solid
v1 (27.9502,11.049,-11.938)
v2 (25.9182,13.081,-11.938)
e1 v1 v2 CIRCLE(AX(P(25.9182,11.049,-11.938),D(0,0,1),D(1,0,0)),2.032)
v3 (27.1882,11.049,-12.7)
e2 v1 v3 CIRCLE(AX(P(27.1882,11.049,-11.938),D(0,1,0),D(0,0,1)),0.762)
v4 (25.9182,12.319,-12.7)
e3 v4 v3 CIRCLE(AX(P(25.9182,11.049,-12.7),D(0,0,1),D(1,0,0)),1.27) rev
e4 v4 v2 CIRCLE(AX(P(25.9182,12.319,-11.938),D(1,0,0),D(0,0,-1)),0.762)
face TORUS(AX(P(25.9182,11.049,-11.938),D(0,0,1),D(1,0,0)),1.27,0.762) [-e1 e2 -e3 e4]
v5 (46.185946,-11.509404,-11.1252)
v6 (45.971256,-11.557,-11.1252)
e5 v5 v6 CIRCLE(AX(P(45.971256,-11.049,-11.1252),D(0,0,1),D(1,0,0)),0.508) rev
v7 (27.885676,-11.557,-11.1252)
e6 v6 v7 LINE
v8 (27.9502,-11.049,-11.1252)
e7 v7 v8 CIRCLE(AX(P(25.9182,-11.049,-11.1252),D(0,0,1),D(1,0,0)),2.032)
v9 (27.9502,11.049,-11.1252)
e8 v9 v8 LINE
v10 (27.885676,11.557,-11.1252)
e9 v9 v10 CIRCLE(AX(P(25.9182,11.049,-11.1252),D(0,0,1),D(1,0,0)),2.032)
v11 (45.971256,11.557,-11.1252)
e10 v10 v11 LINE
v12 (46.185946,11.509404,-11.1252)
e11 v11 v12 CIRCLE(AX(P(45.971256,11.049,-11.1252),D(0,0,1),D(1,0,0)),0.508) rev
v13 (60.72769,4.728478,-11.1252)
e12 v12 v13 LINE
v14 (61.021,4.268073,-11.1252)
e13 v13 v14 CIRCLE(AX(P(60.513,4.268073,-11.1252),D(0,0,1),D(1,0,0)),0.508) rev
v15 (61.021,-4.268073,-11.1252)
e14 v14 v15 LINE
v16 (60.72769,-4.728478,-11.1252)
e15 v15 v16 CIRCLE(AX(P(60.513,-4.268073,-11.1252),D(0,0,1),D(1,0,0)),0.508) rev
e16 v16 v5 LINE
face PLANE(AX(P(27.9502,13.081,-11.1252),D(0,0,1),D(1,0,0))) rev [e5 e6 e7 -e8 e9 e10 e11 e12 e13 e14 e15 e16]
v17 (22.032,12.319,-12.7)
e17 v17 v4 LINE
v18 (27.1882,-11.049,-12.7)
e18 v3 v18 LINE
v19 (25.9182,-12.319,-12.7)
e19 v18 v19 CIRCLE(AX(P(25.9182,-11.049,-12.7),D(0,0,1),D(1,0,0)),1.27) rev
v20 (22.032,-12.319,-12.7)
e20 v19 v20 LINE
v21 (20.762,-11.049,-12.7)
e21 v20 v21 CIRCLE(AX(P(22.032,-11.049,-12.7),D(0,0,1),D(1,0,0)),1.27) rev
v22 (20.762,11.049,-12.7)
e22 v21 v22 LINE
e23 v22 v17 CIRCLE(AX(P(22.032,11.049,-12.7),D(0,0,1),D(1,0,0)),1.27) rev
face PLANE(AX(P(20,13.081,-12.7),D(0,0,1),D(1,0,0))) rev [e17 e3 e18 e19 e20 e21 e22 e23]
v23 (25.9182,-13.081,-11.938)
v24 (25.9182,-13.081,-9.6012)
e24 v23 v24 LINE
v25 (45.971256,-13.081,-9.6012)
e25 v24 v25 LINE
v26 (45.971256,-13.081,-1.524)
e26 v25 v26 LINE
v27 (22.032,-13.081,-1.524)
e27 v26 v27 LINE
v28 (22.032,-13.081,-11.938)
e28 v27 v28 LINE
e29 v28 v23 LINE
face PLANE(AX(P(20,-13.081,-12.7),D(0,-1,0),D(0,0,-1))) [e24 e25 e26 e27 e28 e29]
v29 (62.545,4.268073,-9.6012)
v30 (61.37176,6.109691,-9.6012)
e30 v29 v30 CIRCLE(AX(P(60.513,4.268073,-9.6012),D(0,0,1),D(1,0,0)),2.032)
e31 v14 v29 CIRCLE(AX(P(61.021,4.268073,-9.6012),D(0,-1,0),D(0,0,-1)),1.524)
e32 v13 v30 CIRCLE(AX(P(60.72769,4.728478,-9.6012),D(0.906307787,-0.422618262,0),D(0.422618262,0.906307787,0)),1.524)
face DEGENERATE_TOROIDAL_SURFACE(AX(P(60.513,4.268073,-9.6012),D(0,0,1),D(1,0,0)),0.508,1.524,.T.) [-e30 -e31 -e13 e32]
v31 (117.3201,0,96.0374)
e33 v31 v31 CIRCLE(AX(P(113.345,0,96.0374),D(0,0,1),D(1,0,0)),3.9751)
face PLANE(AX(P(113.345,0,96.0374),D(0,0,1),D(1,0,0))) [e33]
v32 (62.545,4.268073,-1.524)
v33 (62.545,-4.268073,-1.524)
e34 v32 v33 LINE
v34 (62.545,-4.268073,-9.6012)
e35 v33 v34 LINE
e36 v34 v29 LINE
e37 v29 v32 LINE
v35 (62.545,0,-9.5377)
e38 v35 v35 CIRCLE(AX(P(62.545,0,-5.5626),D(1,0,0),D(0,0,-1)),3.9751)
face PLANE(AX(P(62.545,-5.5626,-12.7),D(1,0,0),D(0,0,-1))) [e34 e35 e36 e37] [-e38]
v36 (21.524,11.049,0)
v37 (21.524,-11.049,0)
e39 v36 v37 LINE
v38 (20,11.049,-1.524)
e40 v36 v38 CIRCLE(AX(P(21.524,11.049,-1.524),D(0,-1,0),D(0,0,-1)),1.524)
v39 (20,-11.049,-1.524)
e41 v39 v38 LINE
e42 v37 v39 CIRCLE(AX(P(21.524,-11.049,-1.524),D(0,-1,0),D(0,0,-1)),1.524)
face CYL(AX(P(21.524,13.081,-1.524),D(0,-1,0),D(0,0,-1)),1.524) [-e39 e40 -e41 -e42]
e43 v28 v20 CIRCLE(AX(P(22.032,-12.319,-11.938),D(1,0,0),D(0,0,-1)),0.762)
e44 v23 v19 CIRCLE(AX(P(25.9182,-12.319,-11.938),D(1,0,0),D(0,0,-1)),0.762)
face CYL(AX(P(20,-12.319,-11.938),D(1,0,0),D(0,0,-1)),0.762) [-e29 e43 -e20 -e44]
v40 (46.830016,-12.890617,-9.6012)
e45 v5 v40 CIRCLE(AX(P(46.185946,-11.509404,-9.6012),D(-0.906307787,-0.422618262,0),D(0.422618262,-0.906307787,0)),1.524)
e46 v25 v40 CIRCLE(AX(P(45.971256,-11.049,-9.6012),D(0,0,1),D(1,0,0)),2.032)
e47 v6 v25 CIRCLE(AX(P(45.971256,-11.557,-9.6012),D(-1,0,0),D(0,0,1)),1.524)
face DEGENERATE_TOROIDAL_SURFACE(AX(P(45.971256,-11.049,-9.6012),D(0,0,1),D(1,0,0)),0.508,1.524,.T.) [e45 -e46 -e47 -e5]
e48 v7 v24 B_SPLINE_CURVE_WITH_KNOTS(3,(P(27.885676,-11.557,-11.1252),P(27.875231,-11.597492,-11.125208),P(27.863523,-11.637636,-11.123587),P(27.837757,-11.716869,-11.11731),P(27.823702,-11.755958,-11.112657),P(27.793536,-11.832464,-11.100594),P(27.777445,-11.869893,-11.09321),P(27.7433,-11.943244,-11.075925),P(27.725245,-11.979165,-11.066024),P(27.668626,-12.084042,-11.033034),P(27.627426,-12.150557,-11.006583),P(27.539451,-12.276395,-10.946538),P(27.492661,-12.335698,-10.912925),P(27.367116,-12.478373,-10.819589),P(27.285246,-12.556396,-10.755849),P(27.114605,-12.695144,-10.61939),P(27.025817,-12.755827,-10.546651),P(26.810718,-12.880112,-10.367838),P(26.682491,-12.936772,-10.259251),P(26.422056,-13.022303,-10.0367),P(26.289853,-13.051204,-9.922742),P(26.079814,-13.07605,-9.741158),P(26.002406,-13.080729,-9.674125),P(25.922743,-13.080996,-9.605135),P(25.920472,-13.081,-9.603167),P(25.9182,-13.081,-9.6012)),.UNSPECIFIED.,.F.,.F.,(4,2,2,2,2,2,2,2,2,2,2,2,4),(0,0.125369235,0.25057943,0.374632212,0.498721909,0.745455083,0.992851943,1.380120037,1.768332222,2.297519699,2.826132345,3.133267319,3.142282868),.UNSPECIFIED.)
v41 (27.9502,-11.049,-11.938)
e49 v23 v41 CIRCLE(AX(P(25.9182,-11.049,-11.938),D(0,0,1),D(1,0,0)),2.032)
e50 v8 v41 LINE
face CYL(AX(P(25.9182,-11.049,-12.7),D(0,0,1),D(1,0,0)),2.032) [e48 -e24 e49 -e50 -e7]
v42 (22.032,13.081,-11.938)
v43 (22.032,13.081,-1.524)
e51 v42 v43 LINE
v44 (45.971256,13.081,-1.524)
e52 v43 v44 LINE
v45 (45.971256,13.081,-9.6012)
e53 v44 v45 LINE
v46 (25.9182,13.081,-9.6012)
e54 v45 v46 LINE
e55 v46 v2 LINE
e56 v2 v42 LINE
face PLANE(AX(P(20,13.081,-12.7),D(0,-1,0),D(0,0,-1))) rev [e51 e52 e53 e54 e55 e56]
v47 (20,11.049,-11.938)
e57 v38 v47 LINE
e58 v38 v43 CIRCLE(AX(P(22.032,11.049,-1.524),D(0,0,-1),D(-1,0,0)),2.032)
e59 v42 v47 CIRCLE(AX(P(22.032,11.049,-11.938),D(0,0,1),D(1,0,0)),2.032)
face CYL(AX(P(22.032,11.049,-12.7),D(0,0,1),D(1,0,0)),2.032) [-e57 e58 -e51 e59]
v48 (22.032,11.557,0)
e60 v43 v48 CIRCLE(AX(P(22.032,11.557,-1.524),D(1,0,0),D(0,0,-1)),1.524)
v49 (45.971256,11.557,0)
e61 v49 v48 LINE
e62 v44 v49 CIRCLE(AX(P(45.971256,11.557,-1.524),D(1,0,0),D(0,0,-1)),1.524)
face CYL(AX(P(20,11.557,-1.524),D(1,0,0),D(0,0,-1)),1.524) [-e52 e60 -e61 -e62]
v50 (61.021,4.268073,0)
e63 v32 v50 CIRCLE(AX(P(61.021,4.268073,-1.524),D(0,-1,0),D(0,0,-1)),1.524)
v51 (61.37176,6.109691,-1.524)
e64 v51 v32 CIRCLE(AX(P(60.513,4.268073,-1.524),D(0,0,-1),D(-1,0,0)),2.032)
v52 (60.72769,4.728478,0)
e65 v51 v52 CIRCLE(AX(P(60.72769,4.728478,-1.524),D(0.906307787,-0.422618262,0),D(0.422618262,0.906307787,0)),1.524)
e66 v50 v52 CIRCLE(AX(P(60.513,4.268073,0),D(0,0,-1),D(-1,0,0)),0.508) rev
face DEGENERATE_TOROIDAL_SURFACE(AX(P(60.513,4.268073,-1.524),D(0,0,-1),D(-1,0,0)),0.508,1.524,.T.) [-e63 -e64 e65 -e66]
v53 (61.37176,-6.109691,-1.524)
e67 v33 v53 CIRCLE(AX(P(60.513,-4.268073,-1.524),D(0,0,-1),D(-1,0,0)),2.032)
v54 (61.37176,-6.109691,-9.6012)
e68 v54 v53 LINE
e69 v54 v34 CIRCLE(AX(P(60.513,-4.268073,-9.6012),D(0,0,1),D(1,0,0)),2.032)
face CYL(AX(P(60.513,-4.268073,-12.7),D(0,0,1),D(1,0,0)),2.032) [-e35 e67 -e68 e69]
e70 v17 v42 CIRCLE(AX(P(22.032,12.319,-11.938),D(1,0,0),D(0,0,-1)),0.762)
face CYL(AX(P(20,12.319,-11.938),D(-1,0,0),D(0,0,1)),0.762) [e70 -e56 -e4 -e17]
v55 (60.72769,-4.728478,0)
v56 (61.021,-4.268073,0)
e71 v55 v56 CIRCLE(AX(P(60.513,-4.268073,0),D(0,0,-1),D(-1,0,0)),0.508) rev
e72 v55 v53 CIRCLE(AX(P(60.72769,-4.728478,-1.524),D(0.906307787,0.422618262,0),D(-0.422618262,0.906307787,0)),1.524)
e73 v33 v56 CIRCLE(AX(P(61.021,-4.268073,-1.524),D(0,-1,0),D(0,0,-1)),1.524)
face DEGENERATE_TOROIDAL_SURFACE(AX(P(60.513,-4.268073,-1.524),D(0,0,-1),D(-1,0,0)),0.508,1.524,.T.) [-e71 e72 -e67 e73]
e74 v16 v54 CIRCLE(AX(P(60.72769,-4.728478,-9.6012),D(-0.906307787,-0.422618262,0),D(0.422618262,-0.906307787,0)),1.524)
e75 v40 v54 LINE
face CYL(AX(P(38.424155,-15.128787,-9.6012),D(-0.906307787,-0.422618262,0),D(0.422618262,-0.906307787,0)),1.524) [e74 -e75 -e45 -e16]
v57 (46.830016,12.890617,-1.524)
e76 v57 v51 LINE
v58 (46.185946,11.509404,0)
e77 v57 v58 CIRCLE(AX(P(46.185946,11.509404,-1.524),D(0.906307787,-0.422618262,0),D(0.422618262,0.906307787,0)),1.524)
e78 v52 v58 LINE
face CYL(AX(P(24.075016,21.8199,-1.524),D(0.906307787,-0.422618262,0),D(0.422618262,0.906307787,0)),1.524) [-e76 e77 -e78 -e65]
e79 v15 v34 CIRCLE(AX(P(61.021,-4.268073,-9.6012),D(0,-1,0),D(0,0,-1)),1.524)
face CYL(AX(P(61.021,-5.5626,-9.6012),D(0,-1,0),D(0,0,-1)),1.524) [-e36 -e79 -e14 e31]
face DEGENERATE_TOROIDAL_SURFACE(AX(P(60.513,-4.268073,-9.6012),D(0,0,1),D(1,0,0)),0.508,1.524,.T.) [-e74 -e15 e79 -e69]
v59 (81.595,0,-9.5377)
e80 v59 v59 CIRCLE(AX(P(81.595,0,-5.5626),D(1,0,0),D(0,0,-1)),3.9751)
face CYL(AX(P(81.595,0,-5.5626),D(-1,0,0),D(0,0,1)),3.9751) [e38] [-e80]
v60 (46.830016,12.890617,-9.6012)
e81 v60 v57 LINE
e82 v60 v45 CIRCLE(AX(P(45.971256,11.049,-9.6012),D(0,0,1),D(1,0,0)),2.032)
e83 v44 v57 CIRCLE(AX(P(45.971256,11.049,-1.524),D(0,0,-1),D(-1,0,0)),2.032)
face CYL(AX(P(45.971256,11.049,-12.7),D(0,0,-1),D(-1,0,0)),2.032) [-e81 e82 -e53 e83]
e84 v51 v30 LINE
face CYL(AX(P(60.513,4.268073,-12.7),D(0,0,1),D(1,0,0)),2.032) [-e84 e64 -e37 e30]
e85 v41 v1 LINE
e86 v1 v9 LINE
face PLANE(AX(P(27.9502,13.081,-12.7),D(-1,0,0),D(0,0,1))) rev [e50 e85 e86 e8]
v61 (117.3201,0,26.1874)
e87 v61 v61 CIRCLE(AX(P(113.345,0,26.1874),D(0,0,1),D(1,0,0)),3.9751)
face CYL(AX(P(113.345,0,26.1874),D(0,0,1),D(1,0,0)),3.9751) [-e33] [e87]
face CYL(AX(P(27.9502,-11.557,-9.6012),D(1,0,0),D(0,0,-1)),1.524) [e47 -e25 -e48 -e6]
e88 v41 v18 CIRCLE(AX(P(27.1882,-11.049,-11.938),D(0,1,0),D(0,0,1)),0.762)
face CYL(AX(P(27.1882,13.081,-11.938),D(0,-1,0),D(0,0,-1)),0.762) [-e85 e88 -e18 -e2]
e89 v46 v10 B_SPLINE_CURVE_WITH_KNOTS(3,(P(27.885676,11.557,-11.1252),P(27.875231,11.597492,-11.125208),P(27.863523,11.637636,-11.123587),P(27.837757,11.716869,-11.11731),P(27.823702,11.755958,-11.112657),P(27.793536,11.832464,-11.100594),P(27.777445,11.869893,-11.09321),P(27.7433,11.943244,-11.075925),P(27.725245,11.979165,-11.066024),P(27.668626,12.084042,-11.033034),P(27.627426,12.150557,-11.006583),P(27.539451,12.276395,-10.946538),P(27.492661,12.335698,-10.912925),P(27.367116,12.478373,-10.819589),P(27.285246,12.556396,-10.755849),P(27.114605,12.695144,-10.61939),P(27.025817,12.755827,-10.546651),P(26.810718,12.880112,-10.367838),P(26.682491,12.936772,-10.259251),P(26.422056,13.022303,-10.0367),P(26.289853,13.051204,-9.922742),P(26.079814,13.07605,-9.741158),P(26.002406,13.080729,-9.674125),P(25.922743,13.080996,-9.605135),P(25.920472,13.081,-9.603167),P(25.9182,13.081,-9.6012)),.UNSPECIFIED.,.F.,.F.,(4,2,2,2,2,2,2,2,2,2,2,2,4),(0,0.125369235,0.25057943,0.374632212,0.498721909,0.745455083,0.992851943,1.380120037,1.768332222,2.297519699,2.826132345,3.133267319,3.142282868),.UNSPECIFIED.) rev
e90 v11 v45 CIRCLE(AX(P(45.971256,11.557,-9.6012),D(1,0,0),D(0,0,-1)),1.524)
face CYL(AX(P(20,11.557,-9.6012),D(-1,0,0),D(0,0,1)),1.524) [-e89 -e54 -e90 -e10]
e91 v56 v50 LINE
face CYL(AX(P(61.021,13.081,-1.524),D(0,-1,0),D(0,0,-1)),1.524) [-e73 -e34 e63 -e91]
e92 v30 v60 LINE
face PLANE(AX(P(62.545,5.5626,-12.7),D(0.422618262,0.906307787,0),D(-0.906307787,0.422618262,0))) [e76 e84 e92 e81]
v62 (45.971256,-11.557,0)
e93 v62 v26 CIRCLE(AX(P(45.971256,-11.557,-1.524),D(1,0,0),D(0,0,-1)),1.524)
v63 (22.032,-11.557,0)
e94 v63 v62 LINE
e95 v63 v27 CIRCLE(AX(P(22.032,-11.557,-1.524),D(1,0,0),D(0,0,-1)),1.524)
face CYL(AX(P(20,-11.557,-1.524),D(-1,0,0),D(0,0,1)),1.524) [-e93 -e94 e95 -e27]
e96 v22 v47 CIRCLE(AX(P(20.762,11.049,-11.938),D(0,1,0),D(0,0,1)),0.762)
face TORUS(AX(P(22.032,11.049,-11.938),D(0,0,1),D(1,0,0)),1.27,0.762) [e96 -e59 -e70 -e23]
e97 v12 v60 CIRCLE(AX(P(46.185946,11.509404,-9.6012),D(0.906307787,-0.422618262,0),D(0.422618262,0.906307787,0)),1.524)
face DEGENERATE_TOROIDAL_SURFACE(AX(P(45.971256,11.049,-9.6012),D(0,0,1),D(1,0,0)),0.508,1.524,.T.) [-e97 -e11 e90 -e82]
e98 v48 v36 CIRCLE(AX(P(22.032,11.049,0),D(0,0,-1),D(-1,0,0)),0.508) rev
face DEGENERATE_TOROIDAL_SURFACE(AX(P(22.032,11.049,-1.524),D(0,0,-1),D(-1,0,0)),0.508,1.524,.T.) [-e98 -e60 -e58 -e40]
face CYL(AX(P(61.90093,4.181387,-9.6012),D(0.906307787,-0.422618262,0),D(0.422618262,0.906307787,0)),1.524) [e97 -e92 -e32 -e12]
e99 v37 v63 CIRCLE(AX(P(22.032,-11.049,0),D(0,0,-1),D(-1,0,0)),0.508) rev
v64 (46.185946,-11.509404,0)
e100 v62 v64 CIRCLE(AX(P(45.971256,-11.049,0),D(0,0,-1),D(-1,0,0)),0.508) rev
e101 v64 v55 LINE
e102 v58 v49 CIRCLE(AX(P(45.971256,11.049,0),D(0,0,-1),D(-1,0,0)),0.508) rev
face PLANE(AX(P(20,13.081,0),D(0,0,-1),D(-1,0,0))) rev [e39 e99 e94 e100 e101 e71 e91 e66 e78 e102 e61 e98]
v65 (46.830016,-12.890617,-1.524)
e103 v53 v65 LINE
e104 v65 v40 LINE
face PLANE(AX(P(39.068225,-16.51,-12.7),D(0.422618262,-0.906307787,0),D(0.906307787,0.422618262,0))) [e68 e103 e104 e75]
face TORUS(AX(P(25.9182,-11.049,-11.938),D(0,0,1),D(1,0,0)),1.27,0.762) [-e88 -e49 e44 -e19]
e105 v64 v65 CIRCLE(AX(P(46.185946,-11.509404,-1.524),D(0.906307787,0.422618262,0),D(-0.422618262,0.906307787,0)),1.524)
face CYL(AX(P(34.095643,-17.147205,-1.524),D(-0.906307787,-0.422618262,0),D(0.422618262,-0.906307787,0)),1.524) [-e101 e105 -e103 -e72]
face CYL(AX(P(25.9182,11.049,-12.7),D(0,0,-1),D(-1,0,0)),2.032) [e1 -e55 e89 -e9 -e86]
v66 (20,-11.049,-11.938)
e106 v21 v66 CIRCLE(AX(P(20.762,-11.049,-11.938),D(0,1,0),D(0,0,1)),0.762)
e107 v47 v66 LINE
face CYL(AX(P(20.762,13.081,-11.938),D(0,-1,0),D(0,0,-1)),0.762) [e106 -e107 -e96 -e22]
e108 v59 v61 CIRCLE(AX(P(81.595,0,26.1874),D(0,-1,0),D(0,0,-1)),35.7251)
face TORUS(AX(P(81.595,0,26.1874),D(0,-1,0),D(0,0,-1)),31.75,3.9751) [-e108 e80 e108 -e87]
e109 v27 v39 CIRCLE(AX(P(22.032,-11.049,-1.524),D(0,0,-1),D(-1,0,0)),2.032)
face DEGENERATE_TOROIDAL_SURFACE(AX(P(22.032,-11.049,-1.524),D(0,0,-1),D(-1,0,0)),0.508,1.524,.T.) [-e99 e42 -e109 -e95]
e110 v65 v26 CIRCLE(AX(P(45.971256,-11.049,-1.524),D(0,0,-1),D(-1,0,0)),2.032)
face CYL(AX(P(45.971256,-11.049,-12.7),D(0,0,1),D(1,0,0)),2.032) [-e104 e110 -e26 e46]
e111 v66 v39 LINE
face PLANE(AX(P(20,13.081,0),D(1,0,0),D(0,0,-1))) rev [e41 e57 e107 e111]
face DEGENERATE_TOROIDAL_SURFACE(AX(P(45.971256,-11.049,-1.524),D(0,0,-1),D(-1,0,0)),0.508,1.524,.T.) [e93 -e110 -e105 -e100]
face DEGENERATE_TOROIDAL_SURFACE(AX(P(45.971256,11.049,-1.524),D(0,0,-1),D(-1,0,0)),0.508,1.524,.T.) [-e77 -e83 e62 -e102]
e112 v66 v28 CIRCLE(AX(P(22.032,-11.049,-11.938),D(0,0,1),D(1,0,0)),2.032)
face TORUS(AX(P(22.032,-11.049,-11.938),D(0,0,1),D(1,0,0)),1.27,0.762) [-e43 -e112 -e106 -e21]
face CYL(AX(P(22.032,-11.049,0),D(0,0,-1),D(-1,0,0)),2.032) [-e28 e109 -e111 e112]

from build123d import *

# Parameters (mm, degrees)
BOSS_EXTRUDE1_DEPTH = 13.081
CUT_EXTRUDE1_START  = -11.1252
CUT_EXTRUDE1_DEPTH  = 11.1252
FILLET1_R           = 2.032
FILLET2_R           = 0.762
FILLET6_R           = 1.524
SKETCH6_R           = 3.9751


# Read off the part's stored shape, not the designer's step: Cut-Extrude1
with BuildPart() as part:
    # Sketch1 → Boss-Extrude1 (new, symmetric)
    with BuildSketch(Plane(origin=(0, 0, 0), x_dir=(1, 0, 0), z_dir=(0, 1, 0))):
        Polygon((27.9502, 12.7), (27.9502, 11.1252), (63.561, 11.1252), (63.561, 0), (20, 0), (20, 12.7), align=None)
    extrude(amount=BOSS_EXTRUDE1_DEPTH, both=True)

    # Cut-Extrude1 outline → Cut-Extrude1 (cut)
    with BuildSketch(Plane.XY.offset(CUT_EXTRUDE1_START)):
        Polygon((62.545, 5.5626), (62.545, -5.5626), (46.421739169, -13.081), (63.561, -13.081), (63.561, 13.081), (46.421739169, 13.081), align=None)
    extrude(amount=CUT_EXTRUDE1_DEPTH, mode=Mode.SUBTRACT)

    # Fillet1
    fillet1_edges = [part.edges().sort_by_distance(p)[0] for p in [
        (27.9502, 13.081, -11.9126),
        (46.421739169, -13.081, -5.5626),
        (46.421739169, 13.081, -5.5626),
        (62.545, -5.5626, -5.5626),
        (62.545, 5.5626, -5.5626),
        (20, 13.081, -6.35),
        (27.9502, -13.081, -11.9126),
        (20, -13.081, -6.35),
    ]]
    fillet(fillet1_edges, radius=FILLET1_R)

    # Fillet2
    fillet2_edges = [part.edges().sort_by_distance(p)[0] for p in [
        (23.9751, -13.081, -12.7),
        (23.9751, 13.081, -12.7),
        (27.9502, 0, -12.7),
        (20, 0, -12.7),
        (20.595159021, -12.485840979, -12.7),
        (20.595159021, 12.485840979, -12.7),
        (27.355040979, 12.485840979, -12.7),
        (27.355040979, -12.485840979, -12.7),
    ]]
    fillet(fillet2_edges, radius=FILLET2_R)

    # Fillet6
    fillet6_edges = [part.edges().sort_by_distance(p)[0] for p in [
        (35.944727807, -13.081, -11.1252),
        (34.001627807, -13.081, 0),
        (54.100888115, 9.500154038, 0),
        (34.001627807, 13.081, 0),
        (20, 0, 0),
        (54.100888115, -9.500154038, 0),
        (62.545, 0, 0),
        (62.226771418, 5.359866034, 0),
        (62.226771418, -5.359866034, 0),
        (20.595159021, -12.485840979, 0),
        (20.595159021, 12.485840979, 0),
        (46.41106091, 13.032833486, 0),
        (46.41106091, -13.032833486, 0),
        (54.100888115, -9.500154038, -11.1252),
        (54.100888115, 9.500154038, -11.1252),
        (62.545, 0, -11.1252),
        (35.944727807, 13.081, -11.1252),
        (62.226771418, 5.359866034, -11.1252),
        (62.226771418, -5.359866034, -11.1252),
        (46.41106091, 13.032833486, -11.1252),
        (46.41106091, -13.032833486, -11.1252),
    ]]
    fillet(fillet6_edges, radius=FILLET6_R)

    # Sweep1: sweep along a path in Sketch4
    with BuildLine(Plane(origin=(0, 0, 0), x_dir=(1, 0, 0), z_dir=(0, 1, 0))) as sweep1_path:
        Line((62.545, 5.5626), (81.595, 5.5626))
        ThreePointArc((81.595, 5.5626), (104.045640303, -3.736759697), (113.345, -26.1874))
        Line((113.345, -26.1874), (113.345, -96.0374))
    # Sketch6 → Sweep1 (sweep)
    with BuildSketch(Plane(origin=(62.545, 0, 0), x_dir=(0, 0, -1), z_dir=(1, 0, 0))):
        with Locations((5.5626, 0)):
            Circle(SKETCH6_R)
    sweep(path=sweep1_path.line)


solid = part.part
